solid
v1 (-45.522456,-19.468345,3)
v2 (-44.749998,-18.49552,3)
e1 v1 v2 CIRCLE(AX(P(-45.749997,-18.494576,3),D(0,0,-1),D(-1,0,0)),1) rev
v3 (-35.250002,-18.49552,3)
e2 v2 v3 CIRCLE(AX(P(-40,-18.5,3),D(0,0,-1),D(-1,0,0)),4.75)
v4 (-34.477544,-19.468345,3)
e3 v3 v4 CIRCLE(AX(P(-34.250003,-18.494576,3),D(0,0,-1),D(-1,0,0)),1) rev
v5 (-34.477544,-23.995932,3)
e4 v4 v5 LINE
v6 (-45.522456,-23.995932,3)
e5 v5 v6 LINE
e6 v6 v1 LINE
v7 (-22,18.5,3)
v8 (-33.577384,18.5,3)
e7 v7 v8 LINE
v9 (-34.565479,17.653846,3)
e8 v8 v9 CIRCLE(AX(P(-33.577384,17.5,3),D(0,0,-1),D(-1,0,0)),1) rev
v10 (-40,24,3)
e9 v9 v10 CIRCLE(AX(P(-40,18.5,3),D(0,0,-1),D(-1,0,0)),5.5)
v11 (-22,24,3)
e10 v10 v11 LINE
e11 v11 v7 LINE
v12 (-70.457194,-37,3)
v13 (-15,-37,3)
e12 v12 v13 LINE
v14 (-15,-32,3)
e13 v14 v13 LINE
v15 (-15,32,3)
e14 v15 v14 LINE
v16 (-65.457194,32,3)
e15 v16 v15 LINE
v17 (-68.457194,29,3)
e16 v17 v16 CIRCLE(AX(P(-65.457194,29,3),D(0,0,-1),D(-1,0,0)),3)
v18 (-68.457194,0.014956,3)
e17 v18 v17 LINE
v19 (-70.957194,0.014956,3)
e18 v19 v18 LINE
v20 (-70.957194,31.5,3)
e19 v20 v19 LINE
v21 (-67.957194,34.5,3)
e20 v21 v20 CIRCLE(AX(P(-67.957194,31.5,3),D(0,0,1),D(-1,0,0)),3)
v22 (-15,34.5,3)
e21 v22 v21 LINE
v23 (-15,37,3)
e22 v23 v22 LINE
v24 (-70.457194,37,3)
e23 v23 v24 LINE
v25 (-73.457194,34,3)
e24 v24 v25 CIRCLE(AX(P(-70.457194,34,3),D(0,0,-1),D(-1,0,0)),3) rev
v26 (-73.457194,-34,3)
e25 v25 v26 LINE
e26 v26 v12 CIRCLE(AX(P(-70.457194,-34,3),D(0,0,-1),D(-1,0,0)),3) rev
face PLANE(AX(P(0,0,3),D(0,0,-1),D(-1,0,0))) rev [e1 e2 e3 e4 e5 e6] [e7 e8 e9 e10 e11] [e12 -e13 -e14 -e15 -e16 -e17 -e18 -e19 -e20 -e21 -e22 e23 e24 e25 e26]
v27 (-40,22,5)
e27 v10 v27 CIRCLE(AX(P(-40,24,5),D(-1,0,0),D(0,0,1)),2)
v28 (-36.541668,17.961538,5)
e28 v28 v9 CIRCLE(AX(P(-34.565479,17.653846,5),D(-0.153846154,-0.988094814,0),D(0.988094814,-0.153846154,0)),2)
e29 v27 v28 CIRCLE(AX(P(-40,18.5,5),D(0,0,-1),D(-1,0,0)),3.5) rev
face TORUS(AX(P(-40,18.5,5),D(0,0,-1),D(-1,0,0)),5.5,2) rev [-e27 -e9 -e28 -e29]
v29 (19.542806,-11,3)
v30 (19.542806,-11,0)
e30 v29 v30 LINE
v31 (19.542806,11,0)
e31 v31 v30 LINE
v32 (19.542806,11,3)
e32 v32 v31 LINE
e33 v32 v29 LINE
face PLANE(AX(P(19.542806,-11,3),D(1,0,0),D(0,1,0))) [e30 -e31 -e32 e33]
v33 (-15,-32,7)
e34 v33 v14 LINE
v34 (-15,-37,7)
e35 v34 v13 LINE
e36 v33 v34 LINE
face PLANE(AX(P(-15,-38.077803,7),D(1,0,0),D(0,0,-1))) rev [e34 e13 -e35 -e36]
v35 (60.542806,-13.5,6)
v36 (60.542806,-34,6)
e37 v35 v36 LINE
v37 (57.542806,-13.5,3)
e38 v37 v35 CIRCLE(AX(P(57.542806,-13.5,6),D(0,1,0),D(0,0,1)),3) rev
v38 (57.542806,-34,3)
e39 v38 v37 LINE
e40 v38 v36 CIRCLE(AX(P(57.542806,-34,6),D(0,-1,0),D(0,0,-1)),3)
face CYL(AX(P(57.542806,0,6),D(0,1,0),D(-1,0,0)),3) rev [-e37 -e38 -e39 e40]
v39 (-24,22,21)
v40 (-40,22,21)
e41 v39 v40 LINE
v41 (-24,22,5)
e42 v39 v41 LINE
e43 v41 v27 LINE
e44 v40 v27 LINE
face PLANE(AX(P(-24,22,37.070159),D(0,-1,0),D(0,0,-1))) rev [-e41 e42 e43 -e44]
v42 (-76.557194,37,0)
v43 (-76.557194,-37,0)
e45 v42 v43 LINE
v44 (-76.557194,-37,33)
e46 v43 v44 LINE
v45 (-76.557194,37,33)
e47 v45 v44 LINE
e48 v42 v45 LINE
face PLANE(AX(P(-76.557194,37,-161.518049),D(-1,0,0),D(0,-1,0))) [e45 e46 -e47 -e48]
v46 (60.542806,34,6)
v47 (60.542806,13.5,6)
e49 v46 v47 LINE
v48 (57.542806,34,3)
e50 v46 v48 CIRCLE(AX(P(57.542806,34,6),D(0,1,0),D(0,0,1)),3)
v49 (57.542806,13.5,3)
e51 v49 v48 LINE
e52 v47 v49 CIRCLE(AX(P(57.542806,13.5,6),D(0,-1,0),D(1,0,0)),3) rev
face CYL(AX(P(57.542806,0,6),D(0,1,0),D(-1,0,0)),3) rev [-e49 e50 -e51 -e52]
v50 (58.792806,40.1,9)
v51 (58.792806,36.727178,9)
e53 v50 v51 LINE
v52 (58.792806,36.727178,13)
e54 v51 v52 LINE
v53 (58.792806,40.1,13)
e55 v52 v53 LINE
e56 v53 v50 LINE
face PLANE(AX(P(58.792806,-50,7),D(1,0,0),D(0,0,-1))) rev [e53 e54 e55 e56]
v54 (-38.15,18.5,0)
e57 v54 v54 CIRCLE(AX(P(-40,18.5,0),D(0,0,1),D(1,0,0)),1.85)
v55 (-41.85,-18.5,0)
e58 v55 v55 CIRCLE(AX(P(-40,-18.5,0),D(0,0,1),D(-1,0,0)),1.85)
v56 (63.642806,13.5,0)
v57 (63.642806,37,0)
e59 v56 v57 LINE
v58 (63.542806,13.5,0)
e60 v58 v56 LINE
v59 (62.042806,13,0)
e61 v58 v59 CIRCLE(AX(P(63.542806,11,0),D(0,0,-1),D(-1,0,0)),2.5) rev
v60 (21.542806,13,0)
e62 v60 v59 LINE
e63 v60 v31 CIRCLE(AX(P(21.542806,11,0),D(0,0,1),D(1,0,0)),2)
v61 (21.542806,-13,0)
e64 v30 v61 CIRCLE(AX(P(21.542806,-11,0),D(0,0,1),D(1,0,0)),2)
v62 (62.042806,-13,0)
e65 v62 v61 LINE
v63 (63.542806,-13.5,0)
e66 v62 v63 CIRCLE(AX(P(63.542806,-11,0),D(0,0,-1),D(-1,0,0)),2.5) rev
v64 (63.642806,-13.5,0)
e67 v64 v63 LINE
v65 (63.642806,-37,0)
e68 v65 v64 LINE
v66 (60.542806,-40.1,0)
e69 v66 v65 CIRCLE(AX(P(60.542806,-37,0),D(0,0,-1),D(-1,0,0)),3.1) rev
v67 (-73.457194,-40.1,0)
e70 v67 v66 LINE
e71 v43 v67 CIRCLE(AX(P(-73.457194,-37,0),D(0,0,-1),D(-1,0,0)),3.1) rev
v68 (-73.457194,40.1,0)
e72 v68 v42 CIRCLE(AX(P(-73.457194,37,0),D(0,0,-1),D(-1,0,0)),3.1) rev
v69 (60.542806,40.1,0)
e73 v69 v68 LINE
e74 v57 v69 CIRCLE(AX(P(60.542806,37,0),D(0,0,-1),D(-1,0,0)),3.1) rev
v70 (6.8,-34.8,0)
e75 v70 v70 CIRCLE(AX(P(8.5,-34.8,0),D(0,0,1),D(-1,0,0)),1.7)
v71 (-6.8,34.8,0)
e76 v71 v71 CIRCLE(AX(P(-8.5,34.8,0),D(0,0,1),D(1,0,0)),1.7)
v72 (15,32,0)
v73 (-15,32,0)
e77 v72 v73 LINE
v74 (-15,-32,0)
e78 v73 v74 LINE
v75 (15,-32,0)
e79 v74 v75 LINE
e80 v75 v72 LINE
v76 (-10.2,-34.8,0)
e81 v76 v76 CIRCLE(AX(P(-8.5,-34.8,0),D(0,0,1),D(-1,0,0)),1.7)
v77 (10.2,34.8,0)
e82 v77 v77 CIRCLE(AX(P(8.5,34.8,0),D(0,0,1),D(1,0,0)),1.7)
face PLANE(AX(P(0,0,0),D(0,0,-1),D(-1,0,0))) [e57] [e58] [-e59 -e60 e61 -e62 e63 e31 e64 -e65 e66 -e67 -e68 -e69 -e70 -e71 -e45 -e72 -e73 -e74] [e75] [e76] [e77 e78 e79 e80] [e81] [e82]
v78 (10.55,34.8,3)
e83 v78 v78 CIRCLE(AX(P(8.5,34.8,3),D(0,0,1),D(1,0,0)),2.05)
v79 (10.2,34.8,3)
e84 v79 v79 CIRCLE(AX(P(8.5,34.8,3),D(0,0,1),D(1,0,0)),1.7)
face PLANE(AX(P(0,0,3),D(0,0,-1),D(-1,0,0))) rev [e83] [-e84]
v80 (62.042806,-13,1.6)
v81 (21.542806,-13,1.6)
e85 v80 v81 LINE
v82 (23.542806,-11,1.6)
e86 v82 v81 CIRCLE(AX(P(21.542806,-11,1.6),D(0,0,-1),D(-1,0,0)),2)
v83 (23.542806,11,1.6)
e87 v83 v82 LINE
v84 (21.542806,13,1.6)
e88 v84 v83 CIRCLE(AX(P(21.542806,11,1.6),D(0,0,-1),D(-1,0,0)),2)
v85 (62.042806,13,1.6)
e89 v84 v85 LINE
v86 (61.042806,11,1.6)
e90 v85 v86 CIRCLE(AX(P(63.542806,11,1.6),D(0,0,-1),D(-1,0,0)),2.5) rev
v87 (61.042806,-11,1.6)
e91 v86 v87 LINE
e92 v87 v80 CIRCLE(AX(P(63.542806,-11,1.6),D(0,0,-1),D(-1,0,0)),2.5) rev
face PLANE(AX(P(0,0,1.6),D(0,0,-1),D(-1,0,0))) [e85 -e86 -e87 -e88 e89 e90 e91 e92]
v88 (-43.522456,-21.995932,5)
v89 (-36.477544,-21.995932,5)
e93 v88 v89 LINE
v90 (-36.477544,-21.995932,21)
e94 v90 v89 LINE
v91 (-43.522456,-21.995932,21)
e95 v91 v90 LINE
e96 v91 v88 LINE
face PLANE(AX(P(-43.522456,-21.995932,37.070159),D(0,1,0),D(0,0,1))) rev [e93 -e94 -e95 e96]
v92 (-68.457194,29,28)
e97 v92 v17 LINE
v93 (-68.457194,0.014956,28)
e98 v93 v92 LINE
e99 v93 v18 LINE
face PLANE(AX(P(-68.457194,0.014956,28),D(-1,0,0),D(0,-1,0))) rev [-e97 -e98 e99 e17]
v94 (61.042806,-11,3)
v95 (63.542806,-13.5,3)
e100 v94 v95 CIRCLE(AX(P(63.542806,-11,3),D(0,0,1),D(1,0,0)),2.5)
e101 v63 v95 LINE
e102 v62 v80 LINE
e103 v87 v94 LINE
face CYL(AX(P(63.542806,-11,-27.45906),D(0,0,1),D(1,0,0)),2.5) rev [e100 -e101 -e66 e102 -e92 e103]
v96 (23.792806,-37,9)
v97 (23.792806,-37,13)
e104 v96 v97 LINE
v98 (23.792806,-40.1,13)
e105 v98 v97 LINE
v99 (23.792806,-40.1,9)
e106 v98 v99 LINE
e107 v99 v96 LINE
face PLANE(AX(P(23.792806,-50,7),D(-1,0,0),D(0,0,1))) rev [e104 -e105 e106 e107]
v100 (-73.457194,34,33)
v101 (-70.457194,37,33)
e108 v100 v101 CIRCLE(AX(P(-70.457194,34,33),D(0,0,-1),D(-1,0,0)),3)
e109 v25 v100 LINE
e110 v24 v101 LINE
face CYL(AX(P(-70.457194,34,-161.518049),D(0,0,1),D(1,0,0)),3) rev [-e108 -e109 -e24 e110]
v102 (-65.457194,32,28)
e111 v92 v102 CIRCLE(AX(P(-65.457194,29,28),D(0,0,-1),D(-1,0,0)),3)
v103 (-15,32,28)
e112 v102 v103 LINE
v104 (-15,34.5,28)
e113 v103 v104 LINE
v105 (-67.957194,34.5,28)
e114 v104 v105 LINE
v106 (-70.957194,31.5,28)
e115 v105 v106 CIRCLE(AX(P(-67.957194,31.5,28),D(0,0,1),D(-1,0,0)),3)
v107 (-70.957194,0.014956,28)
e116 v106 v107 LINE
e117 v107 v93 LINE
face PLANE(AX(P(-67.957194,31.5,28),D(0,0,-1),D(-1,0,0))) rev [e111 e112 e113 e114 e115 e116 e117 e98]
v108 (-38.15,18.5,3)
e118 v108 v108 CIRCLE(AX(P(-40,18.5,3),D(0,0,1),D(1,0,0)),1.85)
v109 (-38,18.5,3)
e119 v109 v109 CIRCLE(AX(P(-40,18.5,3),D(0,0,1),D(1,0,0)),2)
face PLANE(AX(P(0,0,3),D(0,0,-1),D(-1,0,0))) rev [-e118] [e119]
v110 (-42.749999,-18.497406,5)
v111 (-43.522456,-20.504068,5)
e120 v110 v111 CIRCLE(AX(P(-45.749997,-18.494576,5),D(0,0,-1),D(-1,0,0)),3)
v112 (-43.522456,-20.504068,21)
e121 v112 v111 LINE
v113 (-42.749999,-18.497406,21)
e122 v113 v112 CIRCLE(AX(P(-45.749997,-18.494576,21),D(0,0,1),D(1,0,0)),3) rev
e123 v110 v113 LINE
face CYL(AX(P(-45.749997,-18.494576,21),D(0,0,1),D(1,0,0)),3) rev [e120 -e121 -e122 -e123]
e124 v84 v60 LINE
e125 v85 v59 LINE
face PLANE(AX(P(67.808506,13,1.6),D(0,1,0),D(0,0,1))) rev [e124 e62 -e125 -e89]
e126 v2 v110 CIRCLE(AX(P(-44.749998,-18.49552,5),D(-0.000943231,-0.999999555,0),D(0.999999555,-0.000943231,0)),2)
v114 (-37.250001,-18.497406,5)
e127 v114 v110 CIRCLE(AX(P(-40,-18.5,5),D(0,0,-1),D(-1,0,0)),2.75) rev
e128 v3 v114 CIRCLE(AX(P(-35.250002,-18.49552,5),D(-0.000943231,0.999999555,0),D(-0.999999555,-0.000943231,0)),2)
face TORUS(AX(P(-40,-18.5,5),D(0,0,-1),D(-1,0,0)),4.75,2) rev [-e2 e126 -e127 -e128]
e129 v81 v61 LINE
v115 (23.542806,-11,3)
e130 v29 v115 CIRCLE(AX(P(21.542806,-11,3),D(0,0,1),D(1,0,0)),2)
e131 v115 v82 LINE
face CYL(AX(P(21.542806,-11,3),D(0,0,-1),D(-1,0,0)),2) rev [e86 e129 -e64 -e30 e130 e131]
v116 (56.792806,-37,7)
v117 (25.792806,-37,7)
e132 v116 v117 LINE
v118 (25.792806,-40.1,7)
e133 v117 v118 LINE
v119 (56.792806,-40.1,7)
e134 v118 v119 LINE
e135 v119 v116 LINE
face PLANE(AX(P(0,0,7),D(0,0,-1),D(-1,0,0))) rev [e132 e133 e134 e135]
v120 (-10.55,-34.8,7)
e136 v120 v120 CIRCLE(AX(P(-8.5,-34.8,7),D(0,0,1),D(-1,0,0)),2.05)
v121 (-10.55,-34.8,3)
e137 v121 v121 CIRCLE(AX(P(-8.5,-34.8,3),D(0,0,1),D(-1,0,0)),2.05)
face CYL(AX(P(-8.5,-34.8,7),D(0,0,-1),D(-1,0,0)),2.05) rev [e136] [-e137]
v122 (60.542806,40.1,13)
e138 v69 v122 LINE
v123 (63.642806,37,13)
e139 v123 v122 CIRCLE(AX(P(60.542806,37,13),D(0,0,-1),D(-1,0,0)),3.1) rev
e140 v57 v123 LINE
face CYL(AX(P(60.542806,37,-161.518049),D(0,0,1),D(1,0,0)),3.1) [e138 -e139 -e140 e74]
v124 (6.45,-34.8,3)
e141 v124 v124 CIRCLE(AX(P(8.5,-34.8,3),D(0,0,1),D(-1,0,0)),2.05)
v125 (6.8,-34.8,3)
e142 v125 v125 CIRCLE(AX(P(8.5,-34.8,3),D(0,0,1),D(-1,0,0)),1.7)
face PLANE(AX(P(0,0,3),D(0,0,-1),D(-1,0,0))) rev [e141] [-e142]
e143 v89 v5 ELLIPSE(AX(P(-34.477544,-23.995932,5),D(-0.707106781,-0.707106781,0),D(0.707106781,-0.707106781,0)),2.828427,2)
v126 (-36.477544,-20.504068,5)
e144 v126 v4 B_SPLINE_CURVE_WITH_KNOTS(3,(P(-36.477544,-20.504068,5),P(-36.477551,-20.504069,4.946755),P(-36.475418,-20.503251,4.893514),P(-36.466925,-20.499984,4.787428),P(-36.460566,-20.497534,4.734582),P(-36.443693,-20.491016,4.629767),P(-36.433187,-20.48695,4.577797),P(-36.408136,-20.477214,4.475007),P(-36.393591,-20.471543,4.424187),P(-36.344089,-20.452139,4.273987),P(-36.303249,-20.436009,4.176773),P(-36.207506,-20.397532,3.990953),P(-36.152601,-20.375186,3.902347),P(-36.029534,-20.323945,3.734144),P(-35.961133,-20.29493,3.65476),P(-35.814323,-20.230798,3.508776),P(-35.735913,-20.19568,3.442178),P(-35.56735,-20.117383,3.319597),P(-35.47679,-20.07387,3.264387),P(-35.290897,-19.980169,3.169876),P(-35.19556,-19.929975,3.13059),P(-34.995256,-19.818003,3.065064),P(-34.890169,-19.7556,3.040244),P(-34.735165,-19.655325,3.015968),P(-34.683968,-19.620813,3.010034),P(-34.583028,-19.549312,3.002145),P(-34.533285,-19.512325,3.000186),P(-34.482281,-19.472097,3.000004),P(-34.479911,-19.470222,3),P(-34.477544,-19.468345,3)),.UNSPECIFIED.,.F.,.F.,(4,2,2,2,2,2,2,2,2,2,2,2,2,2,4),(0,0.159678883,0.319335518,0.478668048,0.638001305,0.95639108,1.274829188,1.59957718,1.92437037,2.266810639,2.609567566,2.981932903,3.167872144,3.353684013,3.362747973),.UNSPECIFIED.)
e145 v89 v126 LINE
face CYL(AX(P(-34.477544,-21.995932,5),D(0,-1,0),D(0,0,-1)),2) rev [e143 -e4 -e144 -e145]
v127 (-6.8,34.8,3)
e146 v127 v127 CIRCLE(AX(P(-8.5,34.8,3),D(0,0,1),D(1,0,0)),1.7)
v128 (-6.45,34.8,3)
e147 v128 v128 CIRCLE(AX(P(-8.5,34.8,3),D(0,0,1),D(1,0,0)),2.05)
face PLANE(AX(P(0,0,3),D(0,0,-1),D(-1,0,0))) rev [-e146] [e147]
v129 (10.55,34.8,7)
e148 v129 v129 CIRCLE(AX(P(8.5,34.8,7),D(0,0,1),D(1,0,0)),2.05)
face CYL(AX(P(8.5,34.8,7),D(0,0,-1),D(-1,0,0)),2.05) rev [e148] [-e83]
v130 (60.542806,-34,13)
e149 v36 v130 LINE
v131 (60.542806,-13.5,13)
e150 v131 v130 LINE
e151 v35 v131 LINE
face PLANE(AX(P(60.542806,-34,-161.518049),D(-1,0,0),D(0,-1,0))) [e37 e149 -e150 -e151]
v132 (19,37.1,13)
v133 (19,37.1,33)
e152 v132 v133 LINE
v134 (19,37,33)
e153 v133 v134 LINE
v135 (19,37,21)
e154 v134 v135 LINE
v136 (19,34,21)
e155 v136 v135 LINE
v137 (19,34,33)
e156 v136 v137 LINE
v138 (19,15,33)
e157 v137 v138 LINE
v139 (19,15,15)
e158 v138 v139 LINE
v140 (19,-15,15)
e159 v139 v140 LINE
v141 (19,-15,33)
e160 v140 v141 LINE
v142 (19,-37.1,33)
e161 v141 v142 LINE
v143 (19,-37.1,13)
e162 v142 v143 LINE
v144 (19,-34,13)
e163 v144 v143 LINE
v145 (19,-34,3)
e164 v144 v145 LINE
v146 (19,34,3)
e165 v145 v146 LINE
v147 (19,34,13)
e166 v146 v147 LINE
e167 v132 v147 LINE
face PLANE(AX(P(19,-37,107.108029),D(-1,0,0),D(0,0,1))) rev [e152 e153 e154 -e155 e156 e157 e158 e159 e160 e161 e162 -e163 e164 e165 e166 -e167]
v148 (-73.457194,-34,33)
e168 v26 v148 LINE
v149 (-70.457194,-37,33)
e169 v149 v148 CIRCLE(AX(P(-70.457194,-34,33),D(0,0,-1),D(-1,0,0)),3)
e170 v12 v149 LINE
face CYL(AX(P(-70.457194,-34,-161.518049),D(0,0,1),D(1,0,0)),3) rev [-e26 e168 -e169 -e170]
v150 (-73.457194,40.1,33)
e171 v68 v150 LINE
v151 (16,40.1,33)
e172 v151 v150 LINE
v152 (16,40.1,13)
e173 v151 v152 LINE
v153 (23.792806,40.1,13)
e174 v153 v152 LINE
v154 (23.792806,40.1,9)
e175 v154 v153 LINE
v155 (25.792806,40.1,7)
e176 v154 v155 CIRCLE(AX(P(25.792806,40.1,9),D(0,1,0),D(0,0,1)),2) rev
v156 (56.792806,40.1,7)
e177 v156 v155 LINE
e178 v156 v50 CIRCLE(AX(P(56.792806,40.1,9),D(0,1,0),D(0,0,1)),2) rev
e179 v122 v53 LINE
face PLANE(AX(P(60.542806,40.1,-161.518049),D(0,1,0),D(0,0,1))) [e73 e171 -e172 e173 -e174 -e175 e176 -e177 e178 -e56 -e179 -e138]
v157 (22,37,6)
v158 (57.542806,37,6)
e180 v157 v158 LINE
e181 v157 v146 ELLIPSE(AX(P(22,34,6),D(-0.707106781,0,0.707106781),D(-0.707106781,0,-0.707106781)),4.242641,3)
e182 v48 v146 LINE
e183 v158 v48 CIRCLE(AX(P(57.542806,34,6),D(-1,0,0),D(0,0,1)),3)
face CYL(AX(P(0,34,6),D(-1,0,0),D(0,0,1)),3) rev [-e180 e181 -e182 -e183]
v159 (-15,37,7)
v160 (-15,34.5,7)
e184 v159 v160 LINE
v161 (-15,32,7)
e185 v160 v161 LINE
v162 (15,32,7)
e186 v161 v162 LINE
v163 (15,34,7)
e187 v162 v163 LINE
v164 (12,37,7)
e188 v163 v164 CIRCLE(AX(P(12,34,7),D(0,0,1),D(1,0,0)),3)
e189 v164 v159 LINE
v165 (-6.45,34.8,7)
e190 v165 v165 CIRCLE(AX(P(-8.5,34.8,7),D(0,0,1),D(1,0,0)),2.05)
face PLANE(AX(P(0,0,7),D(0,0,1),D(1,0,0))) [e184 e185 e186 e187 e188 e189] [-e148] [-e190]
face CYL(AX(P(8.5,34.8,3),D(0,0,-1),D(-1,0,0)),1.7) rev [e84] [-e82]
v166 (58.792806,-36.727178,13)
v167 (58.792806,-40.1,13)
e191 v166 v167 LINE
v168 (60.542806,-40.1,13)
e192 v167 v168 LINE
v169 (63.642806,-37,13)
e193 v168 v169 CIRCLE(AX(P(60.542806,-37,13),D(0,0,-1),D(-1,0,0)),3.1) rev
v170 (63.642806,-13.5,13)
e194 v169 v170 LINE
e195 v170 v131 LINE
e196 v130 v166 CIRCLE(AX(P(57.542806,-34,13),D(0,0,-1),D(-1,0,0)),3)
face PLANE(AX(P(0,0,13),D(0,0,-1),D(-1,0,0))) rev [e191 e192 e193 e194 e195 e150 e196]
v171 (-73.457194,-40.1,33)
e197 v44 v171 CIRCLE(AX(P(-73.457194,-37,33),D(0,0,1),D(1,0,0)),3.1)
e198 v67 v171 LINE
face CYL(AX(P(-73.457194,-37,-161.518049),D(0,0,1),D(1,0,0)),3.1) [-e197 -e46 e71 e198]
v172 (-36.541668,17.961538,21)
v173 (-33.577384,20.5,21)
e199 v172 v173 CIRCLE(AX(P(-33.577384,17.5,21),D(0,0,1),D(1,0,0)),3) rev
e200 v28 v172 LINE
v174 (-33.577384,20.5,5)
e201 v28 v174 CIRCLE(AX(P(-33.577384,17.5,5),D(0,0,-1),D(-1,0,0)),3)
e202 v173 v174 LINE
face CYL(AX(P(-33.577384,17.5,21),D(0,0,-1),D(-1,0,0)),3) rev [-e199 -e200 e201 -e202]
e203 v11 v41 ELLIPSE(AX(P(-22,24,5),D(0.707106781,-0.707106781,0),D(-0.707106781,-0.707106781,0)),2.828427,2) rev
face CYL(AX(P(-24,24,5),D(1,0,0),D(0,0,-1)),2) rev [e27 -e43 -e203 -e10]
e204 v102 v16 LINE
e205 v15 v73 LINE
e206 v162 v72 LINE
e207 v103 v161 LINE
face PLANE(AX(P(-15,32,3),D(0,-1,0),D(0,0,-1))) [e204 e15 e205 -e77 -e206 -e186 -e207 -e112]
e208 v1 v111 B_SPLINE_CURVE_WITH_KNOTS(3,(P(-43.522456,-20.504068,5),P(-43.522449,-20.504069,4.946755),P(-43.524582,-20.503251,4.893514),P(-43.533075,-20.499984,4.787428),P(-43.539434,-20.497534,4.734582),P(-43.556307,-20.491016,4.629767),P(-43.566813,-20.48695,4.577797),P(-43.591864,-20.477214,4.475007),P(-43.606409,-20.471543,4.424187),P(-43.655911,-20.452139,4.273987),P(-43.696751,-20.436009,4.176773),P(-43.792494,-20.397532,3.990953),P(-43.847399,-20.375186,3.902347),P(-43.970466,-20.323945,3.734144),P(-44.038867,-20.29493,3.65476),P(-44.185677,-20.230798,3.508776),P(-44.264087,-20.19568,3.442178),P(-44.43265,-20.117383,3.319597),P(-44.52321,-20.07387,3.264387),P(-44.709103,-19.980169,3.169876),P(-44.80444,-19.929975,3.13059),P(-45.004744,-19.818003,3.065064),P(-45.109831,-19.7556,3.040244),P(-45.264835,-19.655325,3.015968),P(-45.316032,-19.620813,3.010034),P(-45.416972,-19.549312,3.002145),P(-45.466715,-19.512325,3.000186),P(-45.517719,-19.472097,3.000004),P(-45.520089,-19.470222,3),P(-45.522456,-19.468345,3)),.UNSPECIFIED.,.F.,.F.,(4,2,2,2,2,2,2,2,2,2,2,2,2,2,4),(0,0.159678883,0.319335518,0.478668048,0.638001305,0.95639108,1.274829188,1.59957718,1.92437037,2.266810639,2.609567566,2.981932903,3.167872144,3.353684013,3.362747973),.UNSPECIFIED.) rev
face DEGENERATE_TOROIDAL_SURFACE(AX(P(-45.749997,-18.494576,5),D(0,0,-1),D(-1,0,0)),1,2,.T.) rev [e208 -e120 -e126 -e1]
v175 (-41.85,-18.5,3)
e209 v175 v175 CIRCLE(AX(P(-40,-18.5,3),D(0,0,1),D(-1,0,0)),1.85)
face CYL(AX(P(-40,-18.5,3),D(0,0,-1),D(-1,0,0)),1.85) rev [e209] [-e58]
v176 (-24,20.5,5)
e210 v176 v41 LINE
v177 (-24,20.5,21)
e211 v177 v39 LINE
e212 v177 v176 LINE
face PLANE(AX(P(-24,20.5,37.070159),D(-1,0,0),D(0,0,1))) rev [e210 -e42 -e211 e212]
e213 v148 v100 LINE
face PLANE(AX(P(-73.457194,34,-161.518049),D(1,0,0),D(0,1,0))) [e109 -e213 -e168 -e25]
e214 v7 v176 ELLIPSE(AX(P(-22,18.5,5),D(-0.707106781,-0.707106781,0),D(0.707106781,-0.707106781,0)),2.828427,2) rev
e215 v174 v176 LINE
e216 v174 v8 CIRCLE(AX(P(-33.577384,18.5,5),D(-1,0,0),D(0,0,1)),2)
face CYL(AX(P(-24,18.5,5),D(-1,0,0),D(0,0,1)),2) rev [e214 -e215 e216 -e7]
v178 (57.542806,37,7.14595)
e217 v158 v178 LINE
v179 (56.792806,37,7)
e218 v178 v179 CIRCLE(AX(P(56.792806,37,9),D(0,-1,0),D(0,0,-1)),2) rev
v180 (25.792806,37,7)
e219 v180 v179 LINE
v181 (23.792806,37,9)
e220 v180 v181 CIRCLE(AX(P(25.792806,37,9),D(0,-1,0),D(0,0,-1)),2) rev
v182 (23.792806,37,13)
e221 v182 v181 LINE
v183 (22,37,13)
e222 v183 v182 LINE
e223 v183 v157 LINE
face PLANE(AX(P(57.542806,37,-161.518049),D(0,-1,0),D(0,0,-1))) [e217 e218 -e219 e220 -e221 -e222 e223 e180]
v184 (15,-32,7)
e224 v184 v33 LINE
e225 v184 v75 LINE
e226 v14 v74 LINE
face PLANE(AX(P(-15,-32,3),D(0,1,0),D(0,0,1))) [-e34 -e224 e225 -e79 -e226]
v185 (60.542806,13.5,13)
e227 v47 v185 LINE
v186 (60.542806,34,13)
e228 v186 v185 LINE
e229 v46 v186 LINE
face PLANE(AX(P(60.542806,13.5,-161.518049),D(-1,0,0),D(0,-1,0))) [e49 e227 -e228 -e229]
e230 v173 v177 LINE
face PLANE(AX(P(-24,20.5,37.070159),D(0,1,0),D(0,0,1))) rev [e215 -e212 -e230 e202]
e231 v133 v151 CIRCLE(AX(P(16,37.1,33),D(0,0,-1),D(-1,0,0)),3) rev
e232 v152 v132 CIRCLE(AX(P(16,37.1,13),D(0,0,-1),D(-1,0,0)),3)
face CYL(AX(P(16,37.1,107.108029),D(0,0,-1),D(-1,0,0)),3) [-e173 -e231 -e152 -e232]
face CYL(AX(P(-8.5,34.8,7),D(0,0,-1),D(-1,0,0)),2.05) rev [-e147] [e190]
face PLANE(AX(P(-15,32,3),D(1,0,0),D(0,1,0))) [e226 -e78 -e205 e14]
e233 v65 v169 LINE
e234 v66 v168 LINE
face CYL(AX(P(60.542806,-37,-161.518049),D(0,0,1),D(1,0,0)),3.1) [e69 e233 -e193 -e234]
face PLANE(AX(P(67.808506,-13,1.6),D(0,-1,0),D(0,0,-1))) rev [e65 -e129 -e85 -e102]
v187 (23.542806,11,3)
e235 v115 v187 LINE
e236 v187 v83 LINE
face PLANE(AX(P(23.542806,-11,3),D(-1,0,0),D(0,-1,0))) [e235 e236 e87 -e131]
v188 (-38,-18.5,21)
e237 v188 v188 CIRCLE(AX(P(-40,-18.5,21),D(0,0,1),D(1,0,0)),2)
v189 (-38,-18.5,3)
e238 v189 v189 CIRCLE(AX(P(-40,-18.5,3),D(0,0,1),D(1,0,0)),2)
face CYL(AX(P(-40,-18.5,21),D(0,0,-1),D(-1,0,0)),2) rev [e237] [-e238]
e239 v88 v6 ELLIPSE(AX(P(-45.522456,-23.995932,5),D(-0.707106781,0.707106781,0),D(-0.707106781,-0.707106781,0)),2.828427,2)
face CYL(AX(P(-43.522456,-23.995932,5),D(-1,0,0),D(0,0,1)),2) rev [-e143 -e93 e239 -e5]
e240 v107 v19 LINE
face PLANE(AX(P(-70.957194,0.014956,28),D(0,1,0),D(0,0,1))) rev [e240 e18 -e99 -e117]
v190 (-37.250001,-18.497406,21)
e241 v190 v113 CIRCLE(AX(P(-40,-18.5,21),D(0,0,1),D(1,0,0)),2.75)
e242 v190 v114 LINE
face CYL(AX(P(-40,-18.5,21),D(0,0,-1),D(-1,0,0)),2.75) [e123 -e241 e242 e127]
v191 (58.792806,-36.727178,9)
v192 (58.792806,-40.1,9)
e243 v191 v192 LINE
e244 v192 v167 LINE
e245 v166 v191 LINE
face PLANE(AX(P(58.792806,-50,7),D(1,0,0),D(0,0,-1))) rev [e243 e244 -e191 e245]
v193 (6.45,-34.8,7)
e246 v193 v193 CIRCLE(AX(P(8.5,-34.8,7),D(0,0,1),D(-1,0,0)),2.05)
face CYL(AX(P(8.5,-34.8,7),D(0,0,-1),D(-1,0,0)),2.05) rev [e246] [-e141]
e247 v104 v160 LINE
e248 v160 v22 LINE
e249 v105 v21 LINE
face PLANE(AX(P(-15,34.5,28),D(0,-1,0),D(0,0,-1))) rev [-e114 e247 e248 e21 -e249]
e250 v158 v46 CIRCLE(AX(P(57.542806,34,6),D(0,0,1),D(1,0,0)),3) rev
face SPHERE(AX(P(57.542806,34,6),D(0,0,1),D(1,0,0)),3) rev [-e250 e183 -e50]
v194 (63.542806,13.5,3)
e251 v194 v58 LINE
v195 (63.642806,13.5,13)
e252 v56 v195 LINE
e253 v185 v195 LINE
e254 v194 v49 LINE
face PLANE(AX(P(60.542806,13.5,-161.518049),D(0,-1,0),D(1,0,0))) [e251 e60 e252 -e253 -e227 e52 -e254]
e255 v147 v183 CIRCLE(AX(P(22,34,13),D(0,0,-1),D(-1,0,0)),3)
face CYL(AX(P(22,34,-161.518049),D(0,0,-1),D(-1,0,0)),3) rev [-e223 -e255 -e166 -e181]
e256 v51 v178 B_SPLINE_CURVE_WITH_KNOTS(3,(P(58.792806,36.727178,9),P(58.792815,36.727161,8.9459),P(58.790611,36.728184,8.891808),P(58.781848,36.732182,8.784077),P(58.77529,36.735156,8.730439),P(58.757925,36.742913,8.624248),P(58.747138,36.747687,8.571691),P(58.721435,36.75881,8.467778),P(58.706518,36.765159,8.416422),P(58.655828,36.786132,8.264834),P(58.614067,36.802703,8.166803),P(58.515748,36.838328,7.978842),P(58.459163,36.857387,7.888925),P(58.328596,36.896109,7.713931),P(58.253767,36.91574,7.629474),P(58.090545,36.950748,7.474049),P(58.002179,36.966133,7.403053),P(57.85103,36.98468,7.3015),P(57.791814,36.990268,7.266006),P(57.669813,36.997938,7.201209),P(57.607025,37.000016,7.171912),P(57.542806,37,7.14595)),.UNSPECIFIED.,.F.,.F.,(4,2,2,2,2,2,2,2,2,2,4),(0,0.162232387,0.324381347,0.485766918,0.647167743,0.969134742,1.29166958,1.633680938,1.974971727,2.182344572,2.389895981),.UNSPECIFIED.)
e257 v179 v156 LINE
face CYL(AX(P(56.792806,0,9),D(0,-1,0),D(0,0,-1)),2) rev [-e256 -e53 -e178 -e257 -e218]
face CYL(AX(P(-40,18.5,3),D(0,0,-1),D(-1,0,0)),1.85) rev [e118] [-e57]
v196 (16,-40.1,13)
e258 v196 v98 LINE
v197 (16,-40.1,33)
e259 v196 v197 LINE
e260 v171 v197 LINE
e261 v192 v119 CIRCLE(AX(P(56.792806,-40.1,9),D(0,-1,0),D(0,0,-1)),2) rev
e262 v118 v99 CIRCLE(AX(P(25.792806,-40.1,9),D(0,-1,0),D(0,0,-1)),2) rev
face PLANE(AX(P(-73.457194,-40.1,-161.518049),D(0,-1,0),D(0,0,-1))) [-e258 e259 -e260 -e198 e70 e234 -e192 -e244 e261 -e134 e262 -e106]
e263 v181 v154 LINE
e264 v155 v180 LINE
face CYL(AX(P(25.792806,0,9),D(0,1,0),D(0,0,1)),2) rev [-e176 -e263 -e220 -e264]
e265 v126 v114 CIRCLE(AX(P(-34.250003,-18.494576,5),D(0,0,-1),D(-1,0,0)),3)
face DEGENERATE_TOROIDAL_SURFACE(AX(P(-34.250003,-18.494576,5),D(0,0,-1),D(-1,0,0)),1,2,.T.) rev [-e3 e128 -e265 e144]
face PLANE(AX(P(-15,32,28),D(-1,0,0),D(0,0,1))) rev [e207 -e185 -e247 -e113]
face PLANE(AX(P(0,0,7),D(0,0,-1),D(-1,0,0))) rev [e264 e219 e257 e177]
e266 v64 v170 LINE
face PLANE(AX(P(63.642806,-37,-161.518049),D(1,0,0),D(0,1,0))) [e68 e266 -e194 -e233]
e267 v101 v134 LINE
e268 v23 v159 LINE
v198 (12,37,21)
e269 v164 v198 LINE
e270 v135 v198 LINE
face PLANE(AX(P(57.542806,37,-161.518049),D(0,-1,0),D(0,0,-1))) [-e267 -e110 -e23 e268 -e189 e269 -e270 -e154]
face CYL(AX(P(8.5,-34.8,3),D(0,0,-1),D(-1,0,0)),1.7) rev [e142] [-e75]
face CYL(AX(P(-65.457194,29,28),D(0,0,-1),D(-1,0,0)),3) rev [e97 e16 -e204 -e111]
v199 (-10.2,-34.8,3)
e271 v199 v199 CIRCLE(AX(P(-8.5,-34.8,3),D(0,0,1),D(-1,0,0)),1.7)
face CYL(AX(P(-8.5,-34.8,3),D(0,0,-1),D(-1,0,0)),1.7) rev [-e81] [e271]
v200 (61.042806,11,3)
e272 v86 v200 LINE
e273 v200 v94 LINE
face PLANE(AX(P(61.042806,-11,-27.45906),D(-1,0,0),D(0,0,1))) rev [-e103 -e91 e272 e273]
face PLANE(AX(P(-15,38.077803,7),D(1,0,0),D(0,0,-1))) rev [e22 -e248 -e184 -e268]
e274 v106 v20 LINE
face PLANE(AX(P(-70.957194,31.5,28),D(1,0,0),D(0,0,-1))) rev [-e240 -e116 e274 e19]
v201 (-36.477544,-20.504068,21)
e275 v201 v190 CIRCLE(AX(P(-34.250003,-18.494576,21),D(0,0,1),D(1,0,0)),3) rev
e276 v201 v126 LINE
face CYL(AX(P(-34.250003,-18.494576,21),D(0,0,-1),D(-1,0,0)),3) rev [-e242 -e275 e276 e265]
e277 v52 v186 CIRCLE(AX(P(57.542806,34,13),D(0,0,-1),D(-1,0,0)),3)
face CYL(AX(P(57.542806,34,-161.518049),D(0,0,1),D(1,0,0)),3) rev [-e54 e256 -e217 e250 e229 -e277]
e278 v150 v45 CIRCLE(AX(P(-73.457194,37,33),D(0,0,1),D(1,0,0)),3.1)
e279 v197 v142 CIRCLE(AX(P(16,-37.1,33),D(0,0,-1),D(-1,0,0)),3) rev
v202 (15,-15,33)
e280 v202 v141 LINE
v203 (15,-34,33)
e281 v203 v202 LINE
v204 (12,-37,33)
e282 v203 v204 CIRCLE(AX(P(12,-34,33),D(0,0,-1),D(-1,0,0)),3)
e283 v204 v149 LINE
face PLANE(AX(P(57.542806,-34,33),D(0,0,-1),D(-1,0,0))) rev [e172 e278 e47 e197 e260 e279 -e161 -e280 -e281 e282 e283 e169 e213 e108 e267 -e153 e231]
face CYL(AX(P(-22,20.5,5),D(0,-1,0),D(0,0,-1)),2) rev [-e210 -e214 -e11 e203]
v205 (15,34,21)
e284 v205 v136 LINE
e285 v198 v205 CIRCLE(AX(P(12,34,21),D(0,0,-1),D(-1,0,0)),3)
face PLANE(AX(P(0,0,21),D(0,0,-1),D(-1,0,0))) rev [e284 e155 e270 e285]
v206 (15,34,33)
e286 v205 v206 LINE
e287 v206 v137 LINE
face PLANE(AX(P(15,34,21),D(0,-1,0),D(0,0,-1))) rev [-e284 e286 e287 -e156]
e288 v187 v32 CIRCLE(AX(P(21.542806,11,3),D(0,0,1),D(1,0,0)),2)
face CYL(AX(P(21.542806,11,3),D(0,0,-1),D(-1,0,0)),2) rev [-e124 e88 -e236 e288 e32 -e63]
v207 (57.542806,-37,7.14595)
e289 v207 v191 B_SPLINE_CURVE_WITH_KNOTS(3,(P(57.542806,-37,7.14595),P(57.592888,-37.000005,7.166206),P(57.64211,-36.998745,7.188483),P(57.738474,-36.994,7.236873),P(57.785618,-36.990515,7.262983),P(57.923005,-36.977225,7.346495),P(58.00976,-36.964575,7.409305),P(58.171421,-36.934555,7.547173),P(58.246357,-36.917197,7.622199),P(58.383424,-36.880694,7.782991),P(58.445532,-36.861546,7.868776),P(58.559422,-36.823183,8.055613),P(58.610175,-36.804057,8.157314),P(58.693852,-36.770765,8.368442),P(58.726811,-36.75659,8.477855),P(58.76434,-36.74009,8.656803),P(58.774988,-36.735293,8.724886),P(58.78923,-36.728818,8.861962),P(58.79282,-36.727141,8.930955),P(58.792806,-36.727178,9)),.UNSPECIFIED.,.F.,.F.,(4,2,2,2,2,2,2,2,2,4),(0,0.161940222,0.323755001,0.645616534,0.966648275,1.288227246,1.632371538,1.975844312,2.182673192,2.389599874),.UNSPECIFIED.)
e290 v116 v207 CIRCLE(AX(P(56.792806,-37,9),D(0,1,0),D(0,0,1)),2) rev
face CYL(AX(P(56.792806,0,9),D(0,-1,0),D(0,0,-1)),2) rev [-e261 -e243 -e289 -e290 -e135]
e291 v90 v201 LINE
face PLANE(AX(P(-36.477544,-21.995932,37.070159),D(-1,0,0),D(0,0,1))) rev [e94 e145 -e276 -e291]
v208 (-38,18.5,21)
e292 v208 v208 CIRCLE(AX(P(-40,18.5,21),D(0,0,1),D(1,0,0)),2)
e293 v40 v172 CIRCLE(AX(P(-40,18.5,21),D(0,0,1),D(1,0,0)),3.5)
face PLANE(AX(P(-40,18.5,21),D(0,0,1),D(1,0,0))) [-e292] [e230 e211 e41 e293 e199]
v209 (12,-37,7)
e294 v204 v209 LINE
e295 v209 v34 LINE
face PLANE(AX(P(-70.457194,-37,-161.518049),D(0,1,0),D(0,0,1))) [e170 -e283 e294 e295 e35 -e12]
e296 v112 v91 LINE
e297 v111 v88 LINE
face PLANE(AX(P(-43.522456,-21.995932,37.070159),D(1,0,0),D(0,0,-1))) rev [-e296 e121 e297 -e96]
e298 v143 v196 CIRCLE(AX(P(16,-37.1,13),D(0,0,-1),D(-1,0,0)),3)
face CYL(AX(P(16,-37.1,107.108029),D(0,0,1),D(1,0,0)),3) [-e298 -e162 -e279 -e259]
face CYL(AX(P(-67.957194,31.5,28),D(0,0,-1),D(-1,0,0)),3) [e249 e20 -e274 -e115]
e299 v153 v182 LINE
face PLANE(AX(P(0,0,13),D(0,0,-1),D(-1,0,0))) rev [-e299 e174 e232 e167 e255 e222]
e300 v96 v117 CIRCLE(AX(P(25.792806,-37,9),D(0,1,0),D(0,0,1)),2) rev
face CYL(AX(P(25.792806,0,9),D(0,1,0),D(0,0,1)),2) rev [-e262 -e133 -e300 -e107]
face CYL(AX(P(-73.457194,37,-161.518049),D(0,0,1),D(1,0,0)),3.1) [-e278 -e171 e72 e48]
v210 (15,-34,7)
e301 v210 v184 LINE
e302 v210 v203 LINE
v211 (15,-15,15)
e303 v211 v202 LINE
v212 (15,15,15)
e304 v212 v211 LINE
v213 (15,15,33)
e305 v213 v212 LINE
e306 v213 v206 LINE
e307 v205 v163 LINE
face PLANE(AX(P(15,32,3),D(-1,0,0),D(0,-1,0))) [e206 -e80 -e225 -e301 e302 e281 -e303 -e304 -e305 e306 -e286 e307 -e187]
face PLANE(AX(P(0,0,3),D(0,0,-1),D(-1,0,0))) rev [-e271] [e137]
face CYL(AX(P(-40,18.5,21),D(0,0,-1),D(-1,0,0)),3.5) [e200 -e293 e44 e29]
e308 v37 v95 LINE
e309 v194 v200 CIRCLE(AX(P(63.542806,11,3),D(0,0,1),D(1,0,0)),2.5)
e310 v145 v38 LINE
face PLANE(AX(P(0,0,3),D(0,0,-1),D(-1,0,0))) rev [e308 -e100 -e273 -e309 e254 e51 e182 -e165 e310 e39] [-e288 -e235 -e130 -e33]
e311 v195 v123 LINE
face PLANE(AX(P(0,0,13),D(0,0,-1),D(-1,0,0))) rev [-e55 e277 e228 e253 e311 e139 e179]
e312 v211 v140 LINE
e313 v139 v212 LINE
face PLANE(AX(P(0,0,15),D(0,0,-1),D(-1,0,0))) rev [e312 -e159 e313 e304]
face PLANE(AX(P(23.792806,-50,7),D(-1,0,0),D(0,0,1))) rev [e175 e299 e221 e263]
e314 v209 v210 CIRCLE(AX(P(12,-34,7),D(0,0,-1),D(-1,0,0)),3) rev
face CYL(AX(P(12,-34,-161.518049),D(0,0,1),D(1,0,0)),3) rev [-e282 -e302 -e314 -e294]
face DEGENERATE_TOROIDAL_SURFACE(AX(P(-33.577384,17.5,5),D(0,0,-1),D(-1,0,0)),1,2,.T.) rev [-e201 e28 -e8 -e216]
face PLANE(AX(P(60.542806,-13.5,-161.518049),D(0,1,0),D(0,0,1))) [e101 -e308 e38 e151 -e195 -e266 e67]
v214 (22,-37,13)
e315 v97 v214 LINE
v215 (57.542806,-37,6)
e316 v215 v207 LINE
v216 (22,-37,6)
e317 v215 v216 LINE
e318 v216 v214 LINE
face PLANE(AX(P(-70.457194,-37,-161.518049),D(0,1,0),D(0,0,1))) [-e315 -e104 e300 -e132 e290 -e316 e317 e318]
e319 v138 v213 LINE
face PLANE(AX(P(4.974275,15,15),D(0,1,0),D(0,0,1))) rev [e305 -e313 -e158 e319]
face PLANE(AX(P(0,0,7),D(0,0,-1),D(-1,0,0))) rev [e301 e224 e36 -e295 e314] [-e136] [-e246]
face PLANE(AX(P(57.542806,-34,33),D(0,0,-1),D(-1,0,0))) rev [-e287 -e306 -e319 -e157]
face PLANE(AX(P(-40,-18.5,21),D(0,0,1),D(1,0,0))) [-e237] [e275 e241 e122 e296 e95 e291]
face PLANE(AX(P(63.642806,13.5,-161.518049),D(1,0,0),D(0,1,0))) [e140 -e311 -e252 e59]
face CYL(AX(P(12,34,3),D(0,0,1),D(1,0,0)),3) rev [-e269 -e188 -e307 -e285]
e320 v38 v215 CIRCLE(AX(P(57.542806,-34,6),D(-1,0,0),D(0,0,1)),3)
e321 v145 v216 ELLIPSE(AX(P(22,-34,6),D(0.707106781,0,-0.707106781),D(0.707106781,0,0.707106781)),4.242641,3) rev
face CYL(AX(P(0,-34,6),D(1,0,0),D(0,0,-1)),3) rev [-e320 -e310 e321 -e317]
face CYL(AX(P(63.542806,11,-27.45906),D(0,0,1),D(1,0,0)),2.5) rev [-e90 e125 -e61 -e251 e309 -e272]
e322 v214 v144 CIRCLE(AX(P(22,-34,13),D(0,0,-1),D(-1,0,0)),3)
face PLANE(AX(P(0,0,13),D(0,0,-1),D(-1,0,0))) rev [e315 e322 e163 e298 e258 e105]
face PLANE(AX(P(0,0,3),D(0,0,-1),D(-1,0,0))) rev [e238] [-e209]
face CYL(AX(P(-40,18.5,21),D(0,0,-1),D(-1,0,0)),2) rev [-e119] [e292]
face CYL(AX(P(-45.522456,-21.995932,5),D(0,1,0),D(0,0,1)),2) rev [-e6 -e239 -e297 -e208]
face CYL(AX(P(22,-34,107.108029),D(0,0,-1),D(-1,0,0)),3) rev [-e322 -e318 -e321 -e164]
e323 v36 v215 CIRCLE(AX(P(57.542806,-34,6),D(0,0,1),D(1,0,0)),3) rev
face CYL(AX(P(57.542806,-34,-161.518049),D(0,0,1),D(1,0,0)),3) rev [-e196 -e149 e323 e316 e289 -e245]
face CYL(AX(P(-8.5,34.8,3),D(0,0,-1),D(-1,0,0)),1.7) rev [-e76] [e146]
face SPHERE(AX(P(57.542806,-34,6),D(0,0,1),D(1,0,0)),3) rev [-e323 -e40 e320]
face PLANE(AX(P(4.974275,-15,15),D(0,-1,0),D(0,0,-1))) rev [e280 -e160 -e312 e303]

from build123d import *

# Parameters (mm, degrees)
SKETCH1_W              = 140
SKETCH1_H              = 80
SKETCH1_R              = 1.7
SKETCH1_R_2            = 1.85
SKETCH1_W_2            = 30
SKETCH1_H_2            = 64
BOSS_EXTRUDE1_DEPTH    = 3
LIPO_STRAP_DEPTH       = 3
FILLET1_R              = 3
WALL_DEPTH             = 30
WALL_DIRECTION_2_REACH = 88.341
SKETCH4_W              = 30
SKETCH4_H              = 6.07780277
SKETCH4_R              = 2.05
SERVO_BOLTS_DEPTH      = 4
SKETCH5_W              = 4
SKETCH5_H              = 74
LIPO_WALL_DEPTH        = 30
SKETCH6_R              = 3.5
SKETCH6_R_2            = 2
SKETCH6_R_3            = 2.75
PCB_STANDOFF_DEPTH     = 18
SKETCH8_W              = 4
SKETCH8_H              = 3
WIRE_2_DEPTH           = 12
SKETCH9_W              = 84.893473151
SKETCH9_H              = 106.193160462
CUT_EXTRUDE3_DEPTH     = 20
FILLET2_R              = 3
SKETCH10_W             = 46.265699575
SKETCH10_H             = 26
CUT_EXTRUDE4_DEPTH     = 1.6
SKETCH11_W             = 7.044911652
SKETCH11_H             = 1.491863032
SKETCH11_W_2           = 16
SKETCH11_H_2           = 1.5
BOSS_EXTRUDE6_DEPTH    = 18
FILLET4_R              = 3
FILLET5_R              = 2
FILLET6_R              = 3
SKETCH12_W             = 35
SKETCH12_H             = 100
CUT_EXTRUDE5_DEPTH     = 6
FILLET7_R              = 2
BOSS_EXTRUDE7_DEPTH    = 25
SKETCH14_W             = 20.051449776
SKETCH14_H             = 30
CUT_EXTRUDE6_DEPTH     = 18


with BuildPart() as part:
    # Sketch1 → Boss-Extrude1 (new body)
    with BuildSketch(Plane.XY):
        with Locations((-6.457193845, 0)):
            Rectangle(SKETCH1_W, SKETCH1_H)
        with Locations((-8.5, 34.8)):
            Circle(SKETCH1_R, mode=Mode.SUBTRACT)
        with Locations((8.5, 34.8)):
            Circle(SKETCH1_R, mode=Mode.SUBTRACT)
        with Locations(Location((8.5, -34.8, 0), (0, 0, 180))):
            Circle(SKETCH1_R, mode=Mode.SUBTRACT)
        with Locations(Location((-8.5, -34.8, 0), (0, 0, 180))):
            Circle(SKETCH1_R, mode=Mode.SUBTRACT)
        with Locations((-40, 18.5)):
            Circle(SKETCH1_R_2, mode=Mode.SUBTRACT)
        with Locations(Location((-40, -18.5, 0), (0, 0, 180))):
            Circle(SKETCH1_R_2, mode=Mode.SUBTRACT)
        Rectangle(SKETCH1_W_2, SKETCH1_H_2, mode=Mode.SUBTRACT)
        with BuildLine():
            Line((19.542806155, -11), (19.542806155, 11))
            ThreePointArc((19.542806155, 11), (21.542806155, 13), (23.542806155, 11))
            Line((23.542806155, 11), (23.542806155, -11))
            ThreePointArc((23.542806155, -11), (21.542806155, -13), (19.542806155, -11))
        make_face(mode=Mode.SUBTRACT)
    extrude(amount=BOSS_EXTRUDE1_DEPTH)

    # Sketch2 → lipo strap (cut)
    with BuildSketch(Plane.XY.offset(3)):
        with BuildLine():
            Line((61.042806155, -11), (61.042806155, 11))
            ThreePointArc((61.042806155, 11), (63.542806155, 13.5), (66.042806155, 11))
            Line((66.042806155, 11), (66.042806155, -11))
            ThreePointArc((66.042806155, -11), (63.542806155, -13.5), (61.042806155, -11))
        make_face()
    extrude(amount=-LIPO_STRAP_DEPTH, mode=Mode.SUBTRACT)

    # Fillet1
    fillet1_edges = [part.edges().sort_by_distance(p)[0] for p in [
        (63.542806155, -40, 1.5),
        (-76.457193845, -40, 1.5),
        (-76.457193845, 40, 1.5),
        (63.542806155, 40, 1.5),
    ]]
    fillet(fillet1_edges, radius=FILLET1_R)

    # Sketch3 → wall (add)
    with BuildSketch(Plane.XY.offset(3)):
        with BuildLine():
            Line((60.542806155, 13.5), (63.642806155, 13.5))
            Line((63.642806155, 13.5), (63.642806155, 37))
            ThreePointArc((63.642806155, 37), (62.734837176, 39.192031022), (60.542806155, 40.1))
            Line((60.542806155, 40.1), (-73.457193845, 40.1))
            ThreePointArc((-73.457193845, 40.1), (-75.649224867, 39.192031022), (-76.557193845, 37))
            Line((-76.557193845, 37), (-76.557193845, -37))
            ThreePointArc((-76.557193845, -37), (-75.649224867, -39.192031022), (-73.457193845, -40.1))
            Line((-73.457193845, -40.1), (60.542806155, -40.1))
            ThreePointArc((60.542806155, -40.1), (62.734837176, -39.192031022), (63.642806155, -37))
            Line((63.642806155, -37), (63.642806155, -13.5))
            Line((63.642806155, -13.5), (60.542806155, -13.5))
            Line((60.542806155, -13.5), (60.542806155, -34))
            ThreePointArc((60.542806155, -34), (59.664126498, -36.121320344), (57.542806155, -37))
            Line((57.542806155, -37), (-70.457193845, -37))
            ThreePointArc((-70.457193845, -37), (-72.578514189, -36.121320344), (-73.457193845, -34))
            Line((-73.457193845, -34), (-73.457193845, 34))
            ThreePointArc((-73.457193845, 34), (-72.578514189, 36.121320344), (-70.457193845, 37))
            Line((-70.457193845, 37), (57.542806155, 37))
            ThreePointArc((57.542806155, 37), (59.664126498, 36.121320344), (60.542806155, 34))
            Line((60.542806155, 34), (60.542806155, 13.5))
        make_face()
    extrude(amount=WALL_DEPTH)

    # wall direction 2: up to this face of the body (flat: up to its plane)
    wall_direction_2_end = Plane(part.part.faces().sort_by_distance((-74.844742296, 0, 0))[0])
    # Sketch3 → wall direction 2 (add, up to the picked face)
    with BuildSketch(Plane.XY.offset(3), mode=Mode.PRIVATE) as wall_direction_2_sk1:
        with BuildLine():
            Line((60.542806155, 13.5), (63.642806155, 13.5))
            Line((63.642806155, 13.5), (63.642806155, 37))
            ThreePointArc((63.642806155, 37), (62.734837176, 39.192031022), (60.542806155, 40.1))
            Line((60.542806155, 40.1), (-73.457193845, 40.1))
            ThreePointArc((-73.457193845, 40.1), (-75.649224867, 39.192031022), (-76.557193845, 37))
            Line((-76.557193845, 37), (-76.557193845, -37))
            ThreePointArc((-76.557193845, -37), (-75.649224867, -39.192031022), (-73.457193845, -40.1))
            Line((-73.457193845, -40.1), (60.542806155, -40.1))
            ThreePointArc((60.542806155, -40.1), (62.734837176, -39.192031022), (63.642806155, -37))
            Line((63.642806155, -37), (63.642806155, -13.5))
            Line((63.642806155, -13.5), (60.542806155, -13.5))
            Line((60.542806155, -13.5), (60.542806155, -34))
            ThreePointArc((60.542806155, -34), (59.664126498, -36.121320344), (57.542806155, -37))
            Line((57.542806155, -37), (-70.457193845, -37))
            ThreePointArc((-70.457193845, -37), (-72.578514189, -36.121320344), (-73.457193845, -34))
            Line((-73.457193845, -34), (-73.457193845, 34))
            ThreePointArc((-73.457193845, 34), (-72.578514189, 36.121320344), (-70.457193845, 37))
            Line((-70.457193845, 37), (57.542806155, 37))
            ThreePointArc((57.542806155, 37), (59.664126498, 36.121320344), (60.542806155, 34))
            Line((60.542806155, 34), (60.542806155, 13.5))
        make_face()
    wall_direction_2_tool1 = split(extrude(wall_direction_2_sk1.sketch, amount=-WALL_DIRECTION_2_REACH, mode=Mode.PRIVATE), bisect_by=wall_direction_2_end, keep=Keep.BOTH, mode=Mode.PRIVATE)
    add(wall_direction_2_tool1.solids().sort_by(Axis((62.157987, 23.75, 3), (0, 0, -1)))[0])

    # Sketch4 → servo bolts (add)
    # profile 1 of 2: a face of its own
    with BuildSketch(Plane.XY.offset(3)):
        with Locations((0, 35.038901385)):
            Rectangle(SKETCH4_W, SKETCH4_H)
        with Locations((-8.5, 34.8)):
            Circle(SKETCH4_R, mode=Mode.SUBTRACT)
        with Locations((8.5, 34.8)):
            Circle(SKETCH4_R, mode=Mode.SUBTRACT)
    # profile 2 of 2: a face of its own
    with BuildSketch(Plane.XY.offset(3)):
        with Locations((0, -35.038901385)):
            Rectangle(SKETCH4_W, SKETCH4_H)
        with Locations(Location((8.5, -34.8, 0), (0, 0, 180))):
            Circle(SKETCH4_R, mode=Mode.SUBTRACT)
        with Locations(Location((-8.5, -34.8, 0), (0, 0, 180))):
            Circle(SKETCH4_R, mode=Mode.SUBTRACT)
    extrude(amount=SERVO_BOLTS_DEPTH)

    # Sketch5 → lipo wall (add)
    with BuildSketch(Plane.XY.offset(3)):
        with Locations((17, 0)):
            Rectangle(SKETCH5_W, SKETCH5_H)
    extrude(amount=LIPO_WALL_DEPTH)

    # Sketch6 → PCB standoff (add)
    # profile 1 of 2: a face of its own
    with BuildSketch(Plane.XY.offset(3)):
        with Locations(Location((-40, 18.5, 0), (0, 0, 180))):
            Circle(SKETCH6_R)
        with Locations((-40, 18.5)):
            Circle(SKETCH6_R_2, mode=Mode.SUBTRACT)
    # profile 2 of 2: a face of its own
    with BuildSketch(Plane.XY.offset(3)):
        with Locations(Location((-40, -18.5, 0), (0, 0, 180))):
            Circle(SKETCH6_R_3)
        with Locations((-40, -18.5)):
            Circle(SKETCH6_R_2, mode=Mode.SUBTRACT)
    extrude(amount=PCB_STANDOFF_DEPTH)

    # Sketch8 → wire 2 (cut)
    with BuildSketch(Plane.XY.offset(33)):
        with Locations((17, 35.5)):
            Rectangle(SKETCH8_W, SKETCH8_H)
    extrude(amount=-WIRE_2_DEPTH, mode=Mode.SUBTRACT)

    # Sketch9 → Cut-Extrude3 (cut)
    with BuildSketch(Plane.XY.offset(33)):
        with Locations((61.446736576, 0)):
            Rectangle(SKETCH9_W, SKETCH9_H)
    extrude(amount=-CUT_EXTRUDE3_DEPTH, mode=Mode.SUBTRACT)

    # Fillet2
    fillet2_edges = [part.edges().sort_by_distance(p)[0] for p in [
        (60.542806155, -23.75, 3),
        (59.664126498, -36.121320344, 3),
        (60.542806155, 23.75, 3),
        (59.664126498, 36.121320344, 3),
        (15, -37, 20),
        (15, 37, 14),
        (38.271403077, -37, 3),
        (19, -37, 8),
        (38.271403077, 37, 3),
        (19, 37, 8),
    ]]
    fillet(fillet2_edges, radius=FILLET2_R)

    # Sketch10 → Cut-Extrude4 (cut)
    with BuildSketch(Plane(origin=(0, 0, 0), x_dir=(-1, 0, 0), z_dir=(0, 0, -1))):
        with Locations((-44.675655943, 0)):
            Rectangle(SKETCH10_W, SKETCH10_H)
    extrude(amount=-CUT_EXTRUDE4_DEPTH, mode=Mode.SUBTRACT)

    # Sketch11 → Boss-Extrude6 (add)
    with BuildSketch(Plane.XY.offset(3)):
        with Locations((-40, -21.25)):
            Rectangle(SKETCH11_W, SKETCH11_H)
        with Locations((-32, 21.25)):
            Rectangle(SKETCH11_W_2, SKETCH11_H_2)
    extrude(amount=BOSS_EXTRUDE6_DEPTH)

    # Fillet4
    # the kernel refuses this fillet: 3 mm, written as the material it adds along each edge
    with BuildSketch(Plane(origin=(-41.883138208, -20.504068484, 21), x_dir=(-1.0, 1.8919573654777327e-12, 0), z_dir=(0, 0, -1))) as fillet4_piece_1:
        with BuildLine():
            CenterArc((3.866859234, 2.009492063), FILLET4_R, 180.05404317, 41.999955364)
            ThreePointArc((0.866860568, 2.006662369), (0.641374229, 0.913501222), (0, 0))
            Line((0, 0), (1.639317618, 0))
        make_face()
    extrude(amount=18)
    with BuildSketch(Plane(origin=(-38.116861792, -20.504068484, 21), x_dir=(1.0, 1.887622984429e-12, 0), z_dir=(0, 0, -1))) as fillet4_piece_2:
        with BuildLine():
            CenterArc((3.866859234, -2.009492063), FILLET4_R, 137.946001469, 41.999955362)
            ThreePointArc((0.866860568, -2.006662369), (0.641374229, -0.913501222), (0, 0))
            Line((0, 0), (1.639317618, 0))
        make_face()
    extrude(amount=18)
    with BuildSketch(Plane(origin=(-37.127718677, 20.5, 21), x_dir=(1, 0, 0), z_dir=(0, 0, -1))) as fillet4_piece_3:
        with BuildLine():
            CenterArc((3.550334966, 3), FILLET4_R, 188.849883098, 81.150116902)
            ThreePointArc((0.586050525, 2.538461538), (0.538013756, 1.212670671), (0, 0))
            Line((0, 0), (3.550334966, 0))
        make_face()
    extrude(amount=18)

    # Fillet5
    fillet5_edges = [part.edges().sort_by_distance(p)[0] for p in [
        (-36.477544174, -21.25, 3),
        (-43.522455826, -21.25, 3),
        (-40, -21.995931516, 3),
        (-42.658440839, 16.223447275, 3),
        (-24, 21.25, 3),
        (-32, 22, 3),
        (-40, -15.75, 3),
        (-28.788691855, 20.5, 3),
        (-35.528714617, 19.778663576, 3),
        (-37.04972894, -19.572320447, 3),
        (-42.95027106, -19.572320447, 3),
    ]]
    fillet(fillet5_edges, radius=FILLET5_R)

    # Fillet6
    fillet6_edges = [part.edges().sort_by_distance(p)[0] for p in [
        (19, 40.1, 23),
        (19, -40.1, 23),
    ]]
    fillet(fillet6_edges, radius=FILLET6_R)

    # Sketch12 → Cut-Extrude5 (cut)
    with BuildSketch(Plane.XY.offset(13)):
        with Locations((41.292806155, 0)):
            Rectangle(SKETCH12_W, SKETCH12_H)
    extrude(amount=-CUT_EXTRUDE5_DEPTH, mode=Mode.SUBTRACT)

    # Fillet7
    fillet7_edges = [part.edges().sort_by_distance(p)[0] for p in [
        (58.792806155, 38.413589014, 7),
        (58.792806155, -38.413589014, 7),
        (23.792806155, -38.55, 7),
        (23.792806155, 38.55, 7),
    ]]
    fillet(fillet7_edges, radius=FILLET7_R)

    # Sketch13 → Boss-Extrude7 (add)
    with BuildSketch(Plane.XY.offset(3)):
        with BuildLine():
            Line((-70.957193845, 31.5), (-70.957193845, 0.014955839))
            Line((-70.957193845, 0.014955839), (-68.457193845, 0.014955839))
            Line((-68.457193845, 0.014955839), (-68.457193845, 29))
            ThreePointArc((-68.457193845, 29), (-67.578514189, 31.121320344), (-65.457193845, 32))
            Line((-65.457193845, 32), (-15, 32))
            Line((-15, 32), (-15, 34.5))
            Line((-15, 34.5), (-67.957193845, 34.5))
            ThreePointArc((-67.957193845, 34.5), (-70.078514189, 33.621320344), (-70.957193845, 31.5))
        make_face()
    extrude(amount=BOSS_EXTRUDE7_DEPTH)

    # Sketch14 → Cut-Extrude6 (cut)
    with BuildSketch(Plane.XY.offset(33)):
        with Locations((15, 0)):
            Rectangle(SKETCH14_W, SKETCH14_H)
    extrude(amount=-CUT_EXTRUDE6_DEPTH, mode=Mode.SUBTRACT)


solid = part.part
